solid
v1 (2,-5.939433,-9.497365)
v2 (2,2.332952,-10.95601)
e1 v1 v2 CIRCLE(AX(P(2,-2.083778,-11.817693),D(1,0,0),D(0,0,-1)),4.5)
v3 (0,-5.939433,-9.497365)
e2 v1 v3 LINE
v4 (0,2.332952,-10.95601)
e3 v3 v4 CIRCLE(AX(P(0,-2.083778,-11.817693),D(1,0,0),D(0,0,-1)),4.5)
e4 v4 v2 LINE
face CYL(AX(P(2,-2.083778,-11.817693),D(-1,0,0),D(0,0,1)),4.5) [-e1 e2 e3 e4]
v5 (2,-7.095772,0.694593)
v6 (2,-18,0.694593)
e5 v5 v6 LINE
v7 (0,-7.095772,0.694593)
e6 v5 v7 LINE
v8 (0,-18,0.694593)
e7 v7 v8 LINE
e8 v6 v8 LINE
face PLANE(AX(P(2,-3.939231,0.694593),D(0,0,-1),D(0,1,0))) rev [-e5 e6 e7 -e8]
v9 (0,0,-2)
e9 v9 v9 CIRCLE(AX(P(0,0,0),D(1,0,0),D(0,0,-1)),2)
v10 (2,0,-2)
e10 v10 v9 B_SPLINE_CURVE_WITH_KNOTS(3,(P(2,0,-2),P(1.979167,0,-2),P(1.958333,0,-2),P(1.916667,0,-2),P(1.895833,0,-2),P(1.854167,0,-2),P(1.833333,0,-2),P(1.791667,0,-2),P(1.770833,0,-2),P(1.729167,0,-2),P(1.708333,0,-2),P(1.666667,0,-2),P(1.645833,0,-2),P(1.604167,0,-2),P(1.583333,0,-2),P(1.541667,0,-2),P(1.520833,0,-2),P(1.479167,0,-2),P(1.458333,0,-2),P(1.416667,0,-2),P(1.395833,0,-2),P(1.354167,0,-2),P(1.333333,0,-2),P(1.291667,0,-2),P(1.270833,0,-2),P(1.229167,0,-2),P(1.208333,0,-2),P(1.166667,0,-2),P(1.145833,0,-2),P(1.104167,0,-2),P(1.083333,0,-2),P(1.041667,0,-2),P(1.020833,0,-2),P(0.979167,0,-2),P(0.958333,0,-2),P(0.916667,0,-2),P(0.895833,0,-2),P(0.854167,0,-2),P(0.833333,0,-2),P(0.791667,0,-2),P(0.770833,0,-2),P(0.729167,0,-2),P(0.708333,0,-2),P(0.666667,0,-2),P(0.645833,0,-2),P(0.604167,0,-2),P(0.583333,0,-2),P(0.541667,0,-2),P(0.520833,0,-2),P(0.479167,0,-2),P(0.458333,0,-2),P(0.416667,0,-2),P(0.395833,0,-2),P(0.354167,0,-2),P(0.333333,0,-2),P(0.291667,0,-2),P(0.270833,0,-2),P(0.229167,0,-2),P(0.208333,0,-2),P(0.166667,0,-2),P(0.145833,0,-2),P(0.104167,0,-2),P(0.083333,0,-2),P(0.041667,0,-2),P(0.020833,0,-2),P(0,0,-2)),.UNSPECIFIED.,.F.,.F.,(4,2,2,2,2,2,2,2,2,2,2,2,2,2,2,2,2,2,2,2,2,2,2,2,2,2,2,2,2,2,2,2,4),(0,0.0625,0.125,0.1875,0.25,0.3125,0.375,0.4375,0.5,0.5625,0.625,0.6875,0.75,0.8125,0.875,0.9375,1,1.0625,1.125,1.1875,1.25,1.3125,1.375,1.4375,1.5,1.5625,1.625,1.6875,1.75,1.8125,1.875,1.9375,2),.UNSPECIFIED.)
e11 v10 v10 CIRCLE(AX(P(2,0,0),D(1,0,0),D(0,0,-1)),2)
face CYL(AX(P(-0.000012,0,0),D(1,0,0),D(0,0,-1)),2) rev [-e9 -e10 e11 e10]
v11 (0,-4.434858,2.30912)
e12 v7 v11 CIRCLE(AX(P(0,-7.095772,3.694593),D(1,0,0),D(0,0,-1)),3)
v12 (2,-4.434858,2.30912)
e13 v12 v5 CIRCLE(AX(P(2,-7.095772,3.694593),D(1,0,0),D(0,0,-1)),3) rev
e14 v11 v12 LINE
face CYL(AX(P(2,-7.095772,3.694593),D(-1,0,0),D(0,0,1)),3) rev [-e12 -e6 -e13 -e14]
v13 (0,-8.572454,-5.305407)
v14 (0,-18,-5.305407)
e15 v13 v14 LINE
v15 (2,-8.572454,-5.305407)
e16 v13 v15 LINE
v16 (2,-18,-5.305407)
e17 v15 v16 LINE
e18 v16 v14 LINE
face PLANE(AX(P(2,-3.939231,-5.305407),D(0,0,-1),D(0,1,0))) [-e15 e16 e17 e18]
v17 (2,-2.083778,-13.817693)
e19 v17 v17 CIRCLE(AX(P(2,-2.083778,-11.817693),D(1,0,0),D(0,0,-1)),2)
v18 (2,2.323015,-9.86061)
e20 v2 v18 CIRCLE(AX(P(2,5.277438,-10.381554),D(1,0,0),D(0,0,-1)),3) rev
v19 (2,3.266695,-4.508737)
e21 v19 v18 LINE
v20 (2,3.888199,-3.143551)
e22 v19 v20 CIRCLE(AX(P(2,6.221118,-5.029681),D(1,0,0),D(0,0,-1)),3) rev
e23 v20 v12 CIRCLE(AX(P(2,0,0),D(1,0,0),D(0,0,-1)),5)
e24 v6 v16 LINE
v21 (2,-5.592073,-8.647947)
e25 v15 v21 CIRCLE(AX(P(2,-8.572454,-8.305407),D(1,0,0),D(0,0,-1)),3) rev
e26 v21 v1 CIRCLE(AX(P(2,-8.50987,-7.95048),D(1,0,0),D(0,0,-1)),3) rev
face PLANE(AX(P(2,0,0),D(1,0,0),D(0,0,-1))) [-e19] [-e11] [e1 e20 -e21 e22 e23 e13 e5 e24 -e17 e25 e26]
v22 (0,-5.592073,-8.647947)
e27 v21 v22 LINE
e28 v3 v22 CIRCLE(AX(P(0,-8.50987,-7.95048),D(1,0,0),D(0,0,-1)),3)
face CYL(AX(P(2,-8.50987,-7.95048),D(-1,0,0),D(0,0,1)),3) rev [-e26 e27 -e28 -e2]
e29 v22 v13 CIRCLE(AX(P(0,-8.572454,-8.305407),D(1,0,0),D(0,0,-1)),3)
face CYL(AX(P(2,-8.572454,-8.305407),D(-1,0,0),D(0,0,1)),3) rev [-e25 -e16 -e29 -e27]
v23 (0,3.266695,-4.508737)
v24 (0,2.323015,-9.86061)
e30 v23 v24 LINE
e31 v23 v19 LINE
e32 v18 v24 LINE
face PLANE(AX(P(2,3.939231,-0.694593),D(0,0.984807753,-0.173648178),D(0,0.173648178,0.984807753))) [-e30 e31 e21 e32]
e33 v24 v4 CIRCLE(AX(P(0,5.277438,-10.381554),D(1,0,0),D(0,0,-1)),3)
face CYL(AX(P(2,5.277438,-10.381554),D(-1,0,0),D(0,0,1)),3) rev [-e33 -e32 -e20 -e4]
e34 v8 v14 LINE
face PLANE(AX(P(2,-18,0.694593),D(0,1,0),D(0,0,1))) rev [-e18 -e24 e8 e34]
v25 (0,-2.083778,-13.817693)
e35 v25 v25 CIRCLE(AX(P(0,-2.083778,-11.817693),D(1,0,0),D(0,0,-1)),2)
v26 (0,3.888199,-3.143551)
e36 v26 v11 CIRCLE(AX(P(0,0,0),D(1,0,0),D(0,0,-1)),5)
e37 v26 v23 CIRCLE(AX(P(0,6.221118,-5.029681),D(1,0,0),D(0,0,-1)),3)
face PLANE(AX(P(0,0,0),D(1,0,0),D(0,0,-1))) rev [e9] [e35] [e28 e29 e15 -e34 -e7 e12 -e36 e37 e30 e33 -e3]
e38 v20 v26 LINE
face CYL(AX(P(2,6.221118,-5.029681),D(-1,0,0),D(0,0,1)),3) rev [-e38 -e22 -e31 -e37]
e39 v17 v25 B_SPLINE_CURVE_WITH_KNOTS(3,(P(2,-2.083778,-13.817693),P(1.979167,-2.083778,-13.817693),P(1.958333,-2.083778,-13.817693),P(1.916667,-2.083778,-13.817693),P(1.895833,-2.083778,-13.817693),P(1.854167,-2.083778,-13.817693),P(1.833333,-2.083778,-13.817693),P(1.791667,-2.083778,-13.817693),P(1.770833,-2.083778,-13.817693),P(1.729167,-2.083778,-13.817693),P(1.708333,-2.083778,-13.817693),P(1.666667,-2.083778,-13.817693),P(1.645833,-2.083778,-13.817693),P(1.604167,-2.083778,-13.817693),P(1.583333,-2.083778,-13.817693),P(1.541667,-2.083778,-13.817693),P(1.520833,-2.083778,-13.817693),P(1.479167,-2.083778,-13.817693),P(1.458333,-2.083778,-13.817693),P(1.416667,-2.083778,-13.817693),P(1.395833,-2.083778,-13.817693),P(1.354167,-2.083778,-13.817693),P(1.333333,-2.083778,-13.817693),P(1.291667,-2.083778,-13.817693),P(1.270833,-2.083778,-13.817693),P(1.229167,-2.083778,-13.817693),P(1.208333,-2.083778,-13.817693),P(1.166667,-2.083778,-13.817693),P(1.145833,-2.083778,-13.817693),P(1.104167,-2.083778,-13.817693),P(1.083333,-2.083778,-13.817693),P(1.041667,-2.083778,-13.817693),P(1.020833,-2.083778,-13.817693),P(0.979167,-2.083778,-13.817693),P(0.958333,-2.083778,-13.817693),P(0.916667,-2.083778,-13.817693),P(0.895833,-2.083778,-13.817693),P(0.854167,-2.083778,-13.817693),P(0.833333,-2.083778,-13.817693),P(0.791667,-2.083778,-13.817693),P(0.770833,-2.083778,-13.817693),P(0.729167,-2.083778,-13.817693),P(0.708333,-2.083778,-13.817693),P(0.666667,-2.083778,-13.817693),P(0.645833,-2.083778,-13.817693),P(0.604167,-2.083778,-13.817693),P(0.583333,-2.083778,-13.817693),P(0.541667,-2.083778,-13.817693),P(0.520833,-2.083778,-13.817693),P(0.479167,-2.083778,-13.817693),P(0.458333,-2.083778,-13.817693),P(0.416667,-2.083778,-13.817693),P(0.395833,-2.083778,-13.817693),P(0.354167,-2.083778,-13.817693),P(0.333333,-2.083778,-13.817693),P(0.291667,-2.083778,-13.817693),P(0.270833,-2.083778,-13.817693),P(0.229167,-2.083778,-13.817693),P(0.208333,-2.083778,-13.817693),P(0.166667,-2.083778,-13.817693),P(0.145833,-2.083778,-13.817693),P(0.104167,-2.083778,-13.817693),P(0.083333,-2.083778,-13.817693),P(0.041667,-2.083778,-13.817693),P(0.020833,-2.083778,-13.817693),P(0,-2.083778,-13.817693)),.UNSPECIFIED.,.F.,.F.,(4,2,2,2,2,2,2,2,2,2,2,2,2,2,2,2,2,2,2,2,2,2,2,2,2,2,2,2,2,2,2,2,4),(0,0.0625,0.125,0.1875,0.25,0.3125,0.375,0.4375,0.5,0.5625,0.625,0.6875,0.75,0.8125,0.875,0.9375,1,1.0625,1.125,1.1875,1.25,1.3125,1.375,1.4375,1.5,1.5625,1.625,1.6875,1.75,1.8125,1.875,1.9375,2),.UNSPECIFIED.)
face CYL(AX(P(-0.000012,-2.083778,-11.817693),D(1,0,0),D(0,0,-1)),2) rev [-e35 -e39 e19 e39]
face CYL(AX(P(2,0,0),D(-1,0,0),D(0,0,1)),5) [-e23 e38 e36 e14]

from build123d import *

# Parameters (mm, degrees)
EXTRUDE_1_DEPTH          = 2
CUT_EXTRUDE_3_DEPTH      = 25.377594344
CUT_EXTRUDE_3_DEPTH_BACK = 25.377594344
SKETCH_1_3_R             = 2
FILLET_1_R               = 3


with BuildPart() as part:
    # 草图1 → 凸台-拉伸1 (new body)
    with BuildSketch(Plane(origin=(0, 0, 0), x_dir=(0, 0, -1), z_dir=(1, 0, 0))):
        with BuildLine():
            Line((0.694592711, 3.939231012), (-0.694592711, -3.939231012))
            Line((-0.694592711, -3.939231012), (3.079360166, -3.939231012))
            ThreePointArc((3.079360166, -3.939231012), (4.494263056, -2.191255253), (5, 0))
            ThreePointArc((5, 0), (4.650004293, 1.837786733), (3.64901597, 3.418286479))
            Line((3.64901597, 3.418286479), (0.694592711, 3.939231012))
        make_face()
        with BuildLine():
            Line((2.259830548, -4.460175545), (-0.694592711, -3.939231012))
            Line((-0.694592711, -3.939231012), (-0.694592711, -4.951519056))
            ThreePointArc((-0.694592711, -4.951519056), (0.820272506, -4.932256382), (2.259830548, -4.460175545))
        make_face()
        with BuildLine():
            Line((3.079360166, -3.939231012), (-0.694592711, -3.939231012))
            Line((-0.694592711, -3.939231012), (2.259830548, -4.460175545))
            ThreePointArc((2.259830548, -4.460175545), (2.68227239, -4.219646292), (3.079360166, -3.939231012))
        make_face()
        with BuildLine():
            Line((-0.694592711, -4.951519056), (-0.694592711, -3.939231012))
            Line((-0.694592711, -3.939231012), (0.694592711, 3.939231012))
            Line((0.694592711, 3.939231012), (3.64901597, 3.418286479))
            ThreePointArc((3.64901597, 3.418286479), (-4.437968609, 2.303135825), (-0.694592711, -4.951519056))
        make_face()
        with BuildLine():
            ThreePointArc((5, 0), (4.494263056, -2.191255253), (3.079360166, -3.939231012))
            Line((3.079360166, -3.939231012), (5.305407289, -3.939231012))
            Line((5.305407289, -3.939231012), (5.305407289, -4.997192896))
            Line((5.305407289, -4.997192896), (9.092867132, -5.665024255))
            ThreePointArc((9.092867132, -5.665024255), (7.386058148, -1.302361333), (10.482052554, 2.213437769))
            Line((10.482052554, 2.213437769), (3.64901597, 3.418286479))
            ThreePointArc((3.64901597, 3.418286479), (4.650004293, 1.837786733), (5, 0))
        make_face()
        with BuildLine():
            Line((5.305407289, -3.939231012), (3.079360166, -3.939231012))
            ThreePointArc((3.079360166, -3.939231012), (2.68227239, -4.219646292), (2.259830548, -4.460175545))
            Line((2.259830548, -4.460175545), (5.305407289, -4.997192896))
            Line((5.305407289, -4.997192896), (5.305407289, -3.939231012))
        make_face()
        with BuildLine():
            ThreePointArc((2.259830548, -4.460175545), (0.820272506, -4.932256382), (-0.694592711, -4.951519056))
            Line((-0.694592711, -4.951519056), (-0.694592711, -18))
            Line((-0.694592711, -18), (5.305407289, -18))
            Line((5.305407289, -18), (5.305407289, -4.997192896))
            Line((5.305407289, -4.997192896), (2.259830548, -4.460175545))
        make_face()
        with BuildLine():
            ThreePointArc((16.317693036, -2.083778132), (14.485990042, 1.539782422), (10.482052554, 2.213437769))
            Line((10.482052554, 2.213437769), (12.512285747, 1.85545288))
            Line((12.512285747, 1.85545288), (11.123100325, -6.023009144))
            Line((11.123100325, -6.023009144), (9.092867132, -5.665024255))
            ThreePointArc((9.092867132, -5.665024255), (13.816227929, -6.115633571), (16.317693036, -2.083778132))
        make_face()
        with BuildLine():
            Line((12.512285747, 1.85545288), (10.482052554, 2.213437769))
            ThreePointArc((10.482052554, 2.213437769), (7.386058148, -1.302361333), (9.092867132, -5.665024255))
            Line((9.092867132, -5.665024255), (11.123100325, -6.023009144))
            Line((11.123100325, -6.023009144), (12.512285747, 1.85545288))
        make_face()
    extrude(amount=EXTRUDE_1_DEPTH)

    # 草图1<3> → 切除-拉伸3 (cut, two sides: drawn at the far end of the back side and taken through both)
    with BuildSketch(Plane(origin=(0, 0, 0), x_dir=(0, 0, -1), z_dir=(1, 0, 0)).offset(-CUT_EXTRUDE_3_DEPTH_BACK)):
        Circle(SKETCH_1_3_R)
        with Locations((11.817693036, -2.083778132)):
            Circle(SKETCH_1_3_R)
    extrude(amount=CUT_EXTRUDE_3_DEPTH + CUT_EXTRUDE_3_DEPTH_BACK, mode=Mode.SUBTRACT)

    # 圆角1
    # the kernel refuses this fillet: 3 mm, written as the material it adds along each edge
    with BuildSketch(Plane(origin=(0, -4.951519056, 0.694592711), x_dir=(0, -1, 0), z_dir=(1, 0, 0))) as fillet_1_piece_1:
        with BuildLine():
            CenterArc((2.144253255, -3), FILLET_1_R, 90, 62.495124604)
            ThreePointArc((-0.516661362, -1.614527733), (-0.189409011, -0.829319334), (0, 0))
            Line((0, 0), (2.144253255, 0))
        make_face()
    extrude(amount=2)
    with BuildSketch(Plane(origin=(0, 3.418286479, -3.64901597), x_dir=(0, -0.17364817766699442, -0.9848077530121968), z_dir=(1, 0, 0))) as fillet_1_piece_2:
        with BuildLine():
            CenterArc((0.872983346, 3), FILLET_1_R, 241.044975628, 28.955024372)
            ThreePointArc((-0.579385409, 0.375), (-0.283214788, 0.19750856), (0, 0))
            Line((0, 0), (0.872983346, 0))
        make_face()
    extrude(amount=2)
    with BuildSketch(Plane(origin=(0, -4.997192896, -5.305407289), x_dir=(0, -0.17364817766692767, -0.9848077530122085), z_dir=(1, 0, 0))) as fillet_1_piece_3:
        with BuildLine():
            CenterArc((FILLET_1_R * 1.19175359259, -FILLET_1_R), FILLET_1_R, 90, 100)
            Line((FILLET_1_R * 0.206945839582, -FILLET_1_R * 1.17364817767), (0, 0))
            Line((0, 0), (FILLET_1_R * 1.19175359259, 0))
        make_face()
    extrude(amount=2)
    with BuildSketch(Plane(origin=(0, -5.665024255, -9.092867132), x_dir=(0, 0.17364817766698767, 0.9848077530121979), z_dir=(1, 0, 0))) as fillet_1_piece_4:
        with BuildLine():
            CenterArc((0.631029591, 3), FILLET_1_R, 248.960530219, 21.039469781)
            ThreePointArc((-0.446003371, 0.2), (-0.220284161, 0.106060125), (0, 0))
            Line((0, 0), (0.631029591, 0))
        make_face()
    extrude(amount=2)
    with BuildSketch(Plane(origin=(0, 2.213437769, -10.482052554), x_dir=(0, 0.2445079523565027, -0.9696472870247357), z_dir=(1, 0, 0))) as fillet_1_piece_5:
        with BuildLine():
            CenterArc((0.651724559, 2.995572307), FILLET_1_R, 245.847242884, 21.039469781)
            Line((-0.575787876, 0.25819889), (0, 0))
            ThreePointArc((0, 0), (0.24439671, 0.00664154), (0.488793419, 0))
        make_face()
    extrude(amount=2)


solid = part.part
